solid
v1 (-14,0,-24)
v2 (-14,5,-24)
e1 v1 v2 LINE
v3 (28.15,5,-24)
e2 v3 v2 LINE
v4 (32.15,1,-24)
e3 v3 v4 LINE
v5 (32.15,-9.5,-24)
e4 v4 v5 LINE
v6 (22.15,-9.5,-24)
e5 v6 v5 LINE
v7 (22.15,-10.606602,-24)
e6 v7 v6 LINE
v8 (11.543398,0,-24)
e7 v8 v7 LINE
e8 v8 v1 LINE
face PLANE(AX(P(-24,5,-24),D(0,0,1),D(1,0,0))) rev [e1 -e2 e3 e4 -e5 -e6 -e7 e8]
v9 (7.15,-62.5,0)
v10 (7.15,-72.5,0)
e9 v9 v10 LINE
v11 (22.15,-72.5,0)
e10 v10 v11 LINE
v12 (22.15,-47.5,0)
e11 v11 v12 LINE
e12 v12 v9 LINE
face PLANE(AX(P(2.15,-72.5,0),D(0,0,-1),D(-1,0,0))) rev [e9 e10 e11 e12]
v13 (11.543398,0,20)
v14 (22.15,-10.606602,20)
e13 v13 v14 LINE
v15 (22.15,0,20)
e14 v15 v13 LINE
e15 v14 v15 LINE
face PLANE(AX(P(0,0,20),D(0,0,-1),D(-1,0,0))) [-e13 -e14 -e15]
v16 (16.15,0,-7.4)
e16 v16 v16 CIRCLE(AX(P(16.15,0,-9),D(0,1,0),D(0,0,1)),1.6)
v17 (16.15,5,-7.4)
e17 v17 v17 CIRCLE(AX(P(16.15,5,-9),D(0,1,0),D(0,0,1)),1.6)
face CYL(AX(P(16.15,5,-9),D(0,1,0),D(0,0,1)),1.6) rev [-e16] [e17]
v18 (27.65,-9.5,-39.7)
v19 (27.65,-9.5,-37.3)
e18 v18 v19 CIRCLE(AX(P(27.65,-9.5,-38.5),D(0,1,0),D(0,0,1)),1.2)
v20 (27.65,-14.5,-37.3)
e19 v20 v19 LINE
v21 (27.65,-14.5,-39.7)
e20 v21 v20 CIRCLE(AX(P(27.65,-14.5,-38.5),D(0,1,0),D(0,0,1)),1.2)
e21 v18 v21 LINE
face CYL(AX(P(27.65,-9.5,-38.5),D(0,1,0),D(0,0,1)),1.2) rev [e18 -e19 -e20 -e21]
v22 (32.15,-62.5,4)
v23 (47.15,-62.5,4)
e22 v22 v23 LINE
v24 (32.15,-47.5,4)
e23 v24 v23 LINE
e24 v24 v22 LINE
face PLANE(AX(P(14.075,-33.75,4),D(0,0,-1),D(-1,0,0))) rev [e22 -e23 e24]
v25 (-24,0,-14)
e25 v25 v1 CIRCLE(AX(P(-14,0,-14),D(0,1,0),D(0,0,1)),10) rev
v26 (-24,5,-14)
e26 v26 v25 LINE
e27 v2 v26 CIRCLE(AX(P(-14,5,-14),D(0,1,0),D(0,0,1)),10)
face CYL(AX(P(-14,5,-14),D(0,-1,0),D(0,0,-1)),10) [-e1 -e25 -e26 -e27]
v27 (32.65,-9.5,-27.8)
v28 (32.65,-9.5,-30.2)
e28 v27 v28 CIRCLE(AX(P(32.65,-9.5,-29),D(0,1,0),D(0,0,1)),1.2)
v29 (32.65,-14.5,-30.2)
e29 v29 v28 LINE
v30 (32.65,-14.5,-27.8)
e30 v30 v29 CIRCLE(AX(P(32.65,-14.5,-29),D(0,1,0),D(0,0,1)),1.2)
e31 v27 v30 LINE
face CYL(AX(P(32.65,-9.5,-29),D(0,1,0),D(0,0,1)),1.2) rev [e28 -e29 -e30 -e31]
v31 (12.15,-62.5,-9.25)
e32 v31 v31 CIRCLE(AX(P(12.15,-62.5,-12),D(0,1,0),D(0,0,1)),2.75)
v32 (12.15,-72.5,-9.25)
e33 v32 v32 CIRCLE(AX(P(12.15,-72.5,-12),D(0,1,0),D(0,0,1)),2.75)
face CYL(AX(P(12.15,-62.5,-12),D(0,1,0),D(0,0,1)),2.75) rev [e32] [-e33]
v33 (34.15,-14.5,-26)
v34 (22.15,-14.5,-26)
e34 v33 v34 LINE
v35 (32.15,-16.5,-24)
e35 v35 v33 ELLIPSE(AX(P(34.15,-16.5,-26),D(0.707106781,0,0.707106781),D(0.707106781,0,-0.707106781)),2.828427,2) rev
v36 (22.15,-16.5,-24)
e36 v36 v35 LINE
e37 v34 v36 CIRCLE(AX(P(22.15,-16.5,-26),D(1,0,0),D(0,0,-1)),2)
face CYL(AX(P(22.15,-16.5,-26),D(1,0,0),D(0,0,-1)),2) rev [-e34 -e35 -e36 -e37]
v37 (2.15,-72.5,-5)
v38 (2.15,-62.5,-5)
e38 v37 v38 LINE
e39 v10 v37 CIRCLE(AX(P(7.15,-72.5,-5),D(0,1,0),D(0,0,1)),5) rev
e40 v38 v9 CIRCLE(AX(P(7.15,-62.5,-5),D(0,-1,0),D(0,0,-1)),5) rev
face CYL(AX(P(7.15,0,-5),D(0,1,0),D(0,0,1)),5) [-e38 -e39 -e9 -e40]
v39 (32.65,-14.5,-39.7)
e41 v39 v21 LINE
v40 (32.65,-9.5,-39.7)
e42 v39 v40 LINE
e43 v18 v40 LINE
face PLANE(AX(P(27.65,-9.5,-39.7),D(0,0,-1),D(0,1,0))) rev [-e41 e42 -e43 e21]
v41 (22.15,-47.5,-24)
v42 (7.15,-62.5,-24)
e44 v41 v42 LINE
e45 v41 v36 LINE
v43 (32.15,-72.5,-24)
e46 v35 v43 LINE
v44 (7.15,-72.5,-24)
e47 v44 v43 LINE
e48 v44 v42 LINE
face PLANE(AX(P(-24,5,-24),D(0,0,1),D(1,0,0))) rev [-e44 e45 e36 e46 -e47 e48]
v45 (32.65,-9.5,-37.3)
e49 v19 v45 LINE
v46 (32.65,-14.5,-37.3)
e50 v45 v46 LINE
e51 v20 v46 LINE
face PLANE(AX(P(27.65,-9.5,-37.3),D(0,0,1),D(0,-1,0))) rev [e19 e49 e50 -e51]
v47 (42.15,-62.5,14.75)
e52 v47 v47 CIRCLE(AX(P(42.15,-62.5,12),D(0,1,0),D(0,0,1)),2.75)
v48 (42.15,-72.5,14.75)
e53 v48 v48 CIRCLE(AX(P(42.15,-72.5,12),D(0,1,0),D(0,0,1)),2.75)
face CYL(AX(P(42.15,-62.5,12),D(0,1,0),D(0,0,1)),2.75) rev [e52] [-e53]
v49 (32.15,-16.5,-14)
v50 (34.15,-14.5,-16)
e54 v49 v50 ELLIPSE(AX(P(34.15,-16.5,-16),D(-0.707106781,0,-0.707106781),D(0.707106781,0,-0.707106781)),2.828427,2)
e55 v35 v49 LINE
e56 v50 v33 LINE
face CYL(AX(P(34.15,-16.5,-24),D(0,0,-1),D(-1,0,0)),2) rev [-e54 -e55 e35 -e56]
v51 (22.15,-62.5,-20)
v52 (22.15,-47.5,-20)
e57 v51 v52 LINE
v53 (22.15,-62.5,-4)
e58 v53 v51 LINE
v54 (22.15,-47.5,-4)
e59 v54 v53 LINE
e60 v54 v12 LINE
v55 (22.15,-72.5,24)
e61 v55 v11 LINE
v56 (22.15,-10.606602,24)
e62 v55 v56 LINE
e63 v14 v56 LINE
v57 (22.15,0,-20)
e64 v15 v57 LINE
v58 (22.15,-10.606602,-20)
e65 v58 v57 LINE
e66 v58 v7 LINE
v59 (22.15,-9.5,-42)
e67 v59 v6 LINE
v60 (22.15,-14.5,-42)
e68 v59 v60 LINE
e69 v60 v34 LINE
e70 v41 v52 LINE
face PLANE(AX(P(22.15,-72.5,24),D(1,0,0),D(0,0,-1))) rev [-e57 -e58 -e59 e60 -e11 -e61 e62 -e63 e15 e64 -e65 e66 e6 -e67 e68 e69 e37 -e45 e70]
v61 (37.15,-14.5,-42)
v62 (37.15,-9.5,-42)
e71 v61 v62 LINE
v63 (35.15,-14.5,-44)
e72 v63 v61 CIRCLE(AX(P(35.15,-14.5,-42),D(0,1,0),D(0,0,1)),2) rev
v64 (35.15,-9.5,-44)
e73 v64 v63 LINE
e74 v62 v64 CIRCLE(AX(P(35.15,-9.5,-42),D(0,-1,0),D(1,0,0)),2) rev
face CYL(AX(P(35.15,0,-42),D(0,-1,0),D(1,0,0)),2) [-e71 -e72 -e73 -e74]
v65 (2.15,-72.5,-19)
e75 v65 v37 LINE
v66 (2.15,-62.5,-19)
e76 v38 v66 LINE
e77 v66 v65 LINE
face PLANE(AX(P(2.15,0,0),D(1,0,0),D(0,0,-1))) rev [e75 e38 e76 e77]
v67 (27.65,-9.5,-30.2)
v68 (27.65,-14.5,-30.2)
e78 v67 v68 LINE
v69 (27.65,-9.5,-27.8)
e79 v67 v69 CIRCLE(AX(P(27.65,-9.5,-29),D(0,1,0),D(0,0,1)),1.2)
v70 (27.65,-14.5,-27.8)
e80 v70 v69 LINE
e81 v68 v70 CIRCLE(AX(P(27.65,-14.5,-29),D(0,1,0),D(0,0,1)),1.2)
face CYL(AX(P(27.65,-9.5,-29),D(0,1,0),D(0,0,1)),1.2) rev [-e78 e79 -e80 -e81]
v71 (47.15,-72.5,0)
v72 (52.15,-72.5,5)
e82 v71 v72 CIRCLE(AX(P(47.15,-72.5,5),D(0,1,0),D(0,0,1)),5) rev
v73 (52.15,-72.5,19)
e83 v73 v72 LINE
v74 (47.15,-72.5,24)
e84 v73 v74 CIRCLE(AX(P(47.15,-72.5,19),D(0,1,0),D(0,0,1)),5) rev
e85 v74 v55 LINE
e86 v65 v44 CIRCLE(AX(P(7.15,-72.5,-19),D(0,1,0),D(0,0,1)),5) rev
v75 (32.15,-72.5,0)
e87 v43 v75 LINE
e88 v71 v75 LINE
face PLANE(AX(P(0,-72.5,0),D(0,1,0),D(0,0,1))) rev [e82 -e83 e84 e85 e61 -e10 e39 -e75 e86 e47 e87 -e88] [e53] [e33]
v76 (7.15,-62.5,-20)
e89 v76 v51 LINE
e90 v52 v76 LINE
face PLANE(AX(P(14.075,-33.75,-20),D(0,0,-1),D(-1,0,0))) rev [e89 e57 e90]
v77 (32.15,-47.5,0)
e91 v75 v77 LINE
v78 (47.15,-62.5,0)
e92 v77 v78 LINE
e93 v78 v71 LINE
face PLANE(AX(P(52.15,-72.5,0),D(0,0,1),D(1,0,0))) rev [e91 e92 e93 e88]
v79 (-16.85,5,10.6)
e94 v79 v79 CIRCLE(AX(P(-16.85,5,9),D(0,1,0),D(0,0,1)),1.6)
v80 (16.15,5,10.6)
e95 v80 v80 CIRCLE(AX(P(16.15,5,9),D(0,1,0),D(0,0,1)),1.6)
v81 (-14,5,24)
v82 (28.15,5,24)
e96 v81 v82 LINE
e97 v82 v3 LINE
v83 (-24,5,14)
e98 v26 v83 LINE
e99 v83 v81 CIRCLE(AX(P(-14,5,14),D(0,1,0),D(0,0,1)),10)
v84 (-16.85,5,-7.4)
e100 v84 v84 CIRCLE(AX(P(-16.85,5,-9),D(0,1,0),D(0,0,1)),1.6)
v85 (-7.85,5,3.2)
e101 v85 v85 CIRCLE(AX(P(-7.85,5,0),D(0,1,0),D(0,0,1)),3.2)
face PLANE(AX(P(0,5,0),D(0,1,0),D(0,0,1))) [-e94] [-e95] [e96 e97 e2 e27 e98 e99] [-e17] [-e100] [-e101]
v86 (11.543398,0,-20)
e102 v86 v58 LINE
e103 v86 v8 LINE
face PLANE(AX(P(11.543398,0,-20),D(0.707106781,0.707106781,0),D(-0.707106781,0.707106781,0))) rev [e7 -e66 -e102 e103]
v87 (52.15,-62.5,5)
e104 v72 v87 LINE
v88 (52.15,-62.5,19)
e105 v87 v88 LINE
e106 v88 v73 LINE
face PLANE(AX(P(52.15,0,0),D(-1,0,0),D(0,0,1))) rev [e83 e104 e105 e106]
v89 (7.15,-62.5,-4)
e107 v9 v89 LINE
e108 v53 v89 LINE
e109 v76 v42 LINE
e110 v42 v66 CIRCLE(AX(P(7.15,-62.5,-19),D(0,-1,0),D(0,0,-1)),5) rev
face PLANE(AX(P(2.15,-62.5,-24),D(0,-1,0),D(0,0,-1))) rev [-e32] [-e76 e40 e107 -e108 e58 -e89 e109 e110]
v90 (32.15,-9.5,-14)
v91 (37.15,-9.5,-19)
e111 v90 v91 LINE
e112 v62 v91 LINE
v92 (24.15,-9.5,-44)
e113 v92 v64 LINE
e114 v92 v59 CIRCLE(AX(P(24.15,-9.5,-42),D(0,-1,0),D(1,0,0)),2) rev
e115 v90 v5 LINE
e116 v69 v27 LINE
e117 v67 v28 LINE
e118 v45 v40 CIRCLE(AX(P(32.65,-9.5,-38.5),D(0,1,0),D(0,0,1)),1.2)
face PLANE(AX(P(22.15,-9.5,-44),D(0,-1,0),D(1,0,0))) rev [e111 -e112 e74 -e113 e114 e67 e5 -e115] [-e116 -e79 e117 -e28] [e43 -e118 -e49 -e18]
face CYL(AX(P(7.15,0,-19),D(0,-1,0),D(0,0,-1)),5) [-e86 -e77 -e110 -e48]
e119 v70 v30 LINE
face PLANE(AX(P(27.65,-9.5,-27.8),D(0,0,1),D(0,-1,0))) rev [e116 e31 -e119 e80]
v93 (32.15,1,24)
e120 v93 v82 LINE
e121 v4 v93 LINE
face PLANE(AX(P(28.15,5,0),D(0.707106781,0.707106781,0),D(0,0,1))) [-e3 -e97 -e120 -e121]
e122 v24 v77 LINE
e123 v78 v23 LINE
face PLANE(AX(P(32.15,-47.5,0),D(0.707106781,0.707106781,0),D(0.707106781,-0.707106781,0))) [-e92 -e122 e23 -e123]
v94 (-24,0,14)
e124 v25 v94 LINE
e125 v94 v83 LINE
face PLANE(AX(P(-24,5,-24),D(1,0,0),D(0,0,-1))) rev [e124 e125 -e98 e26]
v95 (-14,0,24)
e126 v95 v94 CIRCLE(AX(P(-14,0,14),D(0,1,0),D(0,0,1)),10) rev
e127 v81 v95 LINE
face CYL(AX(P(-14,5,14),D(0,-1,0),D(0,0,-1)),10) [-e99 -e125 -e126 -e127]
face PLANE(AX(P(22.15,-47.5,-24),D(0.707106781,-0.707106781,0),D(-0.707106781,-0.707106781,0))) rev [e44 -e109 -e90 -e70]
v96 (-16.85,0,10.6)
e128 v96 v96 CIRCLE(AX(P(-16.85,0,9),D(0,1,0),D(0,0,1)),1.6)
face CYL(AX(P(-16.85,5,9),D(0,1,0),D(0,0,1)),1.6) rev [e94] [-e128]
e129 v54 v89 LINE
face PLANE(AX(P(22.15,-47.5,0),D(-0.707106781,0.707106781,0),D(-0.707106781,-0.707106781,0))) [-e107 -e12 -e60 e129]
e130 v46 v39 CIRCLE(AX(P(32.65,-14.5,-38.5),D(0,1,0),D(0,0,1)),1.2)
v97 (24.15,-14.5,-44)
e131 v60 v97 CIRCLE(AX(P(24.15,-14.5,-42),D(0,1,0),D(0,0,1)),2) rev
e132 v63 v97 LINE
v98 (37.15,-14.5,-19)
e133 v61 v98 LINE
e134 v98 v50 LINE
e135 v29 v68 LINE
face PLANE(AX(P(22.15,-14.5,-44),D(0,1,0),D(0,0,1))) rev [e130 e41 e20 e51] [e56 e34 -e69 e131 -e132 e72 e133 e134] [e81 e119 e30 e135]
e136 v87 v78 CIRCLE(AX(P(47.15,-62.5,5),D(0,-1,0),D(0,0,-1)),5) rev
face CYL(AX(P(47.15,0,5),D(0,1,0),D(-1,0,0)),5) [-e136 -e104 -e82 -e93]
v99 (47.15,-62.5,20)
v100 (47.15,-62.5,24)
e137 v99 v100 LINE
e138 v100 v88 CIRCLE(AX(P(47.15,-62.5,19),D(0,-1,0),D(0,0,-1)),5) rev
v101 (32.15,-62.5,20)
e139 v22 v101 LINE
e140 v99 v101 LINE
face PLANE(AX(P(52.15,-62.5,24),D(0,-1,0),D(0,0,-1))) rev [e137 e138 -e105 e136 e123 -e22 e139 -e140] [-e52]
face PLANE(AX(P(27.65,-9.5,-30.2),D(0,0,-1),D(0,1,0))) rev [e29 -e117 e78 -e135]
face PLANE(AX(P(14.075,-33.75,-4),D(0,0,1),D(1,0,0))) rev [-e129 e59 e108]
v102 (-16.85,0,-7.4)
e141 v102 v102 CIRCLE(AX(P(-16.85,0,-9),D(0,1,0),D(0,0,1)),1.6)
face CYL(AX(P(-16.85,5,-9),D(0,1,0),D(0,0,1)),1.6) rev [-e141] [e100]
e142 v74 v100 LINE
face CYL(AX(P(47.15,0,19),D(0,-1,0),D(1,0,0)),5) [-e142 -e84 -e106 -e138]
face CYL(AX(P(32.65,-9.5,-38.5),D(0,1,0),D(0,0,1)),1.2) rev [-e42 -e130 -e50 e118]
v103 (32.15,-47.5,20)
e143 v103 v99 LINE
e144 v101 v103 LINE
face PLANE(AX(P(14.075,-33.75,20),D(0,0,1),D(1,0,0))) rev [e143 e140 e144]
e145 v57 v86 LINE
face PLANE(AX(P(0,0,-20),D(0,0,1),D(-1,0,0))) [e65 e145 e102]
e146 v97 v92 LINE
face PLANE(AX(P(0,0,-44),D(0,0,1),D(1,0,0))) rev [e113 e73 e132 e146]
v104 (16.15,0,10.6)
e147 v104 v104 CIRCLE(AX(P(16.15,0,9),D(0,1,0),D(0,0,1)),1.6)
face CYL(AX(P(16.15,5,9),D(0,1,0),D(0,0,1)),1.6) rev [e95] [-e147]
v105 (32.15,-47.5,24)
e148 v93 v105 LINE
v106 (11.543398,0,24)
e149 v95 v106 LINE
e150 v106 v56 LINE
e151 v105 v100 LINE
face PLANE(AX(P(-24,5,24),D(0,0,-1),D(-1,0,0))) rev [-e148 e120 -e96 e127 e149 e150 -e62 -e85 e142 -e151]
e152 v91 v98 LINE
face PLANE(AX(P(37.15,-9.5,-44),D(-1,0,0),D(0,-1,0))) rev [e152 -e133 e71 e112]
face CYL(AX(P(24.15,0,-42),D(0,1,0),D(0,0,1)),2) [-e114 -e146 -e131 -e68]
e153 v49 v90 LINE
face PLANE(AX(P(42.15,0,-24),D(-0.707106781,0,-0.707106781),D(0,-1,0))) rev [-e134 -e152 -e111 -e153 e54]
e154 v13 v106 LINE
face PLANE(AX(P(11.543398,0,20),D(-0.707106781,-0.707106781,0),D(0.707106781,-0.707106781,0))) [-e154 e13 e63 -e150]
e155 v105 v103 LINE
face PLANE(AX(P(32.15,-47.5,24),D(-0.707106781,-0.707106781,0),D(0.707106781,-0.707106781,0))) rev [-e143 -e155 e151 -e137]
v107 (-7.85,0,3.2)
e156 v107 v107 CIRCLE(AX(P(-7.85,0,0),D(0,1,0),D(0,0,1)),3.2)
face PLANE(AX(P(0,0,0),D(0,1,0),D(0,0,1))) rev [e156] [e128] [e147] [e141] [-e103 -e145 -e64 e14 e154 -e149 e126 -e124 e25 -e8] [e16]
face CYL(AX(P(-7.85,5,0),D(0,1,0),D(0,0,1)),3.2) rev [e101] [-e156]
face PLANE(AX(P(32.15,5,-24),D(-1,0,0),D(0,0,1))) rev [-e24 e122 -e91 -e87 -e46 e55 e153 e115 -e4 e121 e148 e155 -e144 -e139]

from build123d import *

# Parameters (mm, degrees)
SKETCH1_W                 = 56.15
SKETCH1_H                 = 48
BOSS_EXTRUDE1_DEPTH       = 5
SKETCH2_W                 = 10
SKETCH2_H                 = 48
BOSS_EXTRUDE2_DEPTH       = 72.5
SKETCH3_W                 = 24
SKETCH3_H                 = 10
BOSS_EXTRUDE3_DEPTH       = 20
SKETCH20_W                = 24
SKETCH20_H                = 10
BOSS_EXTRUDE5_DEPTH       = 20
FILLET1_R                 = 10
F_1_0MM_DOWEL_HOLE1_D     = 5.5
F_1_0MM_DOWEL_HOLE1_DEPTH = 10
FILLET2_R                 = 5
RIB1_REACH                = 103.39
SKETCH19_WALL_W           = 225.992615606
SKETCH19_WALL_H           = 4
M3_CLEARANCE_HOLE1_D      = 3.2
M3_CLEARANCE_HOLE1_DEPTH  = 5
M6_CLEARANCE_HOLE1_D      = 6.4
CHAMFER2_SIZE             = 4
SKETCH14_W                = 15
SKETCH14_H                = 5
BOSS_EXTRUDE4_DEPTH       = 20
CHAMFER3_SIZE             = 10
FILLET3_R                 = 2
M2_START                  = -14.5
M2_CLEARANCE_SLOT2_DEPTH  = 5
RIB5_REACH                = 103.39
SKETCH21_WALL_W           = 225.992615606
SKETCH21_WALL_H           = 4
BOSS_EXTRUDE6_DEPTH       = 4


# Read off the part's stored shape, not the designer's step: M2 Clearance Slot2
with BuildPart() as part:
    # Sketch1 → Boss-Extrude1 (new body)
    with BuildSketch(Plane(origin=(0, 0, 0), x_dir=(1, 0, 0), z_dir=(0, 1, 0))):
        with Locations((4.075, 0)):
            Rectangle(SKETCH1_W, SKETCH1_H)
    extrude(amount=BOSS_EXTRUDE1_DEPTH)

    # Sketch2 → Boss-Extrude2 (add)
    with BuildSketch(Plane.XZ):
        with Locations((27.15, 0)):
            Rectangle(SKETCH2_W, SKETCH2_H)
    extrude(amount=BOSS_EXTRUDE2_DEPTH)

    # Sketch3 → Boss-Extrude3 (add)
    with BuildSketch(Plane(origin=(32.15, 0, 0), x_dir=(0, 0, -1), z_dir=(1, 0, 0))):
        with Locations((-12, -67.5)):
            Rectangle(SKETCH3_W, SKETCH3_H)
    extrude(amount=BOSS_EXTRUDE3_DEPTH)

    # Sketch20 → Boss-Extrude5 (add)
    with BuildSketch(Plane.ZY.offset(-22.15)):
        with Locations((-12, -67.5)):
            Rectangle(SKETCH20_W, SKETCH20_H)
    extrude(amount=BOSS_EXTRUDE5_DEPTH)

    # Fillet1
    fillet1_edges = [part.edges().sort_by_distance(p)[0] for p in [
        (-24, 2.5, -24),
        (-24, 2.5, 24),
    ]]
    fillet(fillet1_edges, radius=FILLET1_R)

    # Ø1.0mm Dowel Hole1
    with Locations(Plane(origin=(0, -62.5, 0), x_dir=(1, 0, 0), z_dir=(0, 1, 0))):
        with Locations((42.15, -12), (12.15, 12)):
            Hole(F_1_0MM_DOWEL_HOLE1_D / 2, depth=F_1_0MM_DOWEL_HOLE1_DEPTH)

    # Fillet2
    fillet2_edges = [part.edges().sort_by_distance(p)[0] for p in [
        (52.15, -67.5, 24),
        (52.15, -67.5, 0),
        (2.15, -67.5, -24),
        (2.15, -67.5, 0),
    ]]
    fillet(fillet2_edges, radius=FILLET2_R)

    # Sketch19 wall → Rib1 (add, up to next)
    with BuildSketch(Plane(origin=(39.65, -55, 24), x_dir=(0.707106781187, -0.707106781187, 0), z_dir=(0.707106781187, 0.707106781187, 0)), mode=Mode.PRIVATE) as rib1_sk1:
        with Locations((0, 2)):
            Rectangle(SKETCH19_WALL_W, SKETCH19_WALL_H)
    rib1_tool1 = extrude(rib1_sk1.sketch, amount=-RIB1_REACH, mode=Mode.PRIVATE) - part.part
    rib1 = rib1_tool1.solids().sort_by_distance((39.65, -55, 24))[0]
    add(rib1)

    # M3 Clearance Hole1
    with Locations(Plane(origin=(0, 5, 0), x_dir=(1, 0, 0), z_dir=(0, 1, 0))):
        with Locations((-16.85, -9), (-16.85, 9), (16.15, 9), (16.15, -9)):
            Hole(M3_CLEARANCE_HOLE1_D / 2, depth=M3_CLEARANCE_HOLE1_DEPTH)

    # M6 Clearance Hole1 (through all)
    with Locations(Plane(origin=(0, 5, 0), x_dir=(1, 0, 0), z_dir=(0, 1, 0))):
        with Locations((-7.85, 0)):
            Hole(M6_CLEARANCE_HOLE1_D / 2)

    # Chamfer2
    chamfer2_edges = [part.edges().sort_by_distance(p)[0] for p in [
        (32.15, 5, 0),
    ]]
    chamfer(chamfer2_edges, length=CHAMFER2_SIZE)

    # Sketch14 → Boss-Extrude4 (add)
    with BuildSketch(Plane(origin=(0, 0, -24), x_dir=(-1, 0, 0), z_dir=(0, 0, -1))):
        with Locations((-29.65, -12)):
            Rectangle(SKETCH14_W, SKETCH14_H)
    extrude(amount=BOSS_EXTRUDE4_DEPTH)

    # Chamfer3
    # the kernel refuses this chamfer: 10 mm, written as the material it adds along each edge
    with BuildSketch(Plane(origin=(32.15, -9.5, -24), x_dir=(-0.027495876610586317, 0, 0.9996219169112968), z_dir=(0, -1, 0))) as chamfer3_piece_1_section:
        Polygon((CHAMFER3_SIZE * 0.999621916911, -CHAMFER3_SIZE * 0.0274958766106), (-CHAMFER3_SIZE * 0.0274958766106, -CHAMFER3_SIZE * 0.999621916911), (0, 0), align=None)
    chamfer3_piece_1 = extrude(amount=5, mode=Mode.PRIVATE)
    chamfer3_piece_1 = split(chamfer3_piece_1, bisect_by=Plane(origin=(37.15, -12, -20.111111111), z_dir=(-1, 0, 0)), keep=Keep.TOP, mode=Mode.PRIVATE)
    add(chamfer3_piece_1)

    # Fillet3
    fillet3_edges = [part.edges().sort_by_distance(p)[0] for p in [
        (27.15, -14.5, -24),
        (22.15, -12, -44),
        (37.15, -12, -44),
        (32.15, -14.5, -19),
    ]]
    fillet(fillet3_edges, radius=FILLET3_R)

    # M2 Clearance Slot2 outline → M2 Clearance Slot2 (cut)
    with BuildSketch(Plane(origin=(0, 0, 0), x_dir=(1, 0, 0), z_dir=(0, 1, 0)).offset(M2_START)):
        with BuildLine():
            Line((32.65, 39.7), (27.65, 39.7))
            ThreePointArc((27.65, 39.7), (26.45, 38.5), (27.65, 37.3))
            Line((27.65, 37.3), (32.65, 37.3))
            ThreePointArc((32.65, 37.3), (33.85, 38.5), (32.65, 39.7))
        make_face()
        with BuildLine():
            ThreePointArc((32.65, 27.8), (33.85, 29), (32.65, 30.2))
            Line((32.65, 30.2), (27.65, 30.2))
            ThreePointArc((27.65, 30.2), (26.45, 29), (27.65, 27.8))
            Line((27.65, 27.8), (32.65, 27.8))
        make_face()
    extrude(amount=M2_CLEARANCE_SLOT2_DEPTH, mode=Mode.SUBTRACT)

    # Mirror1: Rib1 across plane
    add(rib1.mirror(Plane(origin=(52.15, -62.5, 12), x_dir=(1, 0, 0), z_dir=(0, 0, -1))))

    # Sketch21 wall → Rib5 (add, up to next)
    with BuildSketch(Plane(origin=(14.65, -55, -24), x_dir=(-0.707106781187, -0.707106781187, 0), z_dir=(-0.707106781187, 0.707106781187, 0)), mode=Mode.PRIVATE) as rib5_sk1:
        with Locations((0, 2)):
            Rectangle(SKETCH21_WALL_W, SKETCH21_WALL_H)
    rib5_tool1 = extrude(rib5_sk1.sketch, amount=-RIB5_REACH, mode=Mode.PRIVATE) - part.part
    rib5 = rib5_tool1.solids().sort_by_distance((14.65, -55, -24))[0]
    add(rib5)

    # Mirror2: Rib5 across plane
    add(rib5.mirror(Plane(origin=(2.15, -62.5, -12), x_dir=(1, 0, 0), z_dir=(0, 0, 1))))

    # Sketch24 → Boss-Extrude6 (add)
    with BuildSketch(Plane.XY.offset(24)):
        Polygon((11.543398282, 0), (22.15, -10.606601718), (22.15, 0), align=None)
    boss_extrude6 = extrude(amount=-BOSS_EXTRUDE6_DEPTH)

    # Mirror3: Boss-Extrude6 across plane
    add(boss_extrude6.mirror(Plane.XY))


solid = part.part
